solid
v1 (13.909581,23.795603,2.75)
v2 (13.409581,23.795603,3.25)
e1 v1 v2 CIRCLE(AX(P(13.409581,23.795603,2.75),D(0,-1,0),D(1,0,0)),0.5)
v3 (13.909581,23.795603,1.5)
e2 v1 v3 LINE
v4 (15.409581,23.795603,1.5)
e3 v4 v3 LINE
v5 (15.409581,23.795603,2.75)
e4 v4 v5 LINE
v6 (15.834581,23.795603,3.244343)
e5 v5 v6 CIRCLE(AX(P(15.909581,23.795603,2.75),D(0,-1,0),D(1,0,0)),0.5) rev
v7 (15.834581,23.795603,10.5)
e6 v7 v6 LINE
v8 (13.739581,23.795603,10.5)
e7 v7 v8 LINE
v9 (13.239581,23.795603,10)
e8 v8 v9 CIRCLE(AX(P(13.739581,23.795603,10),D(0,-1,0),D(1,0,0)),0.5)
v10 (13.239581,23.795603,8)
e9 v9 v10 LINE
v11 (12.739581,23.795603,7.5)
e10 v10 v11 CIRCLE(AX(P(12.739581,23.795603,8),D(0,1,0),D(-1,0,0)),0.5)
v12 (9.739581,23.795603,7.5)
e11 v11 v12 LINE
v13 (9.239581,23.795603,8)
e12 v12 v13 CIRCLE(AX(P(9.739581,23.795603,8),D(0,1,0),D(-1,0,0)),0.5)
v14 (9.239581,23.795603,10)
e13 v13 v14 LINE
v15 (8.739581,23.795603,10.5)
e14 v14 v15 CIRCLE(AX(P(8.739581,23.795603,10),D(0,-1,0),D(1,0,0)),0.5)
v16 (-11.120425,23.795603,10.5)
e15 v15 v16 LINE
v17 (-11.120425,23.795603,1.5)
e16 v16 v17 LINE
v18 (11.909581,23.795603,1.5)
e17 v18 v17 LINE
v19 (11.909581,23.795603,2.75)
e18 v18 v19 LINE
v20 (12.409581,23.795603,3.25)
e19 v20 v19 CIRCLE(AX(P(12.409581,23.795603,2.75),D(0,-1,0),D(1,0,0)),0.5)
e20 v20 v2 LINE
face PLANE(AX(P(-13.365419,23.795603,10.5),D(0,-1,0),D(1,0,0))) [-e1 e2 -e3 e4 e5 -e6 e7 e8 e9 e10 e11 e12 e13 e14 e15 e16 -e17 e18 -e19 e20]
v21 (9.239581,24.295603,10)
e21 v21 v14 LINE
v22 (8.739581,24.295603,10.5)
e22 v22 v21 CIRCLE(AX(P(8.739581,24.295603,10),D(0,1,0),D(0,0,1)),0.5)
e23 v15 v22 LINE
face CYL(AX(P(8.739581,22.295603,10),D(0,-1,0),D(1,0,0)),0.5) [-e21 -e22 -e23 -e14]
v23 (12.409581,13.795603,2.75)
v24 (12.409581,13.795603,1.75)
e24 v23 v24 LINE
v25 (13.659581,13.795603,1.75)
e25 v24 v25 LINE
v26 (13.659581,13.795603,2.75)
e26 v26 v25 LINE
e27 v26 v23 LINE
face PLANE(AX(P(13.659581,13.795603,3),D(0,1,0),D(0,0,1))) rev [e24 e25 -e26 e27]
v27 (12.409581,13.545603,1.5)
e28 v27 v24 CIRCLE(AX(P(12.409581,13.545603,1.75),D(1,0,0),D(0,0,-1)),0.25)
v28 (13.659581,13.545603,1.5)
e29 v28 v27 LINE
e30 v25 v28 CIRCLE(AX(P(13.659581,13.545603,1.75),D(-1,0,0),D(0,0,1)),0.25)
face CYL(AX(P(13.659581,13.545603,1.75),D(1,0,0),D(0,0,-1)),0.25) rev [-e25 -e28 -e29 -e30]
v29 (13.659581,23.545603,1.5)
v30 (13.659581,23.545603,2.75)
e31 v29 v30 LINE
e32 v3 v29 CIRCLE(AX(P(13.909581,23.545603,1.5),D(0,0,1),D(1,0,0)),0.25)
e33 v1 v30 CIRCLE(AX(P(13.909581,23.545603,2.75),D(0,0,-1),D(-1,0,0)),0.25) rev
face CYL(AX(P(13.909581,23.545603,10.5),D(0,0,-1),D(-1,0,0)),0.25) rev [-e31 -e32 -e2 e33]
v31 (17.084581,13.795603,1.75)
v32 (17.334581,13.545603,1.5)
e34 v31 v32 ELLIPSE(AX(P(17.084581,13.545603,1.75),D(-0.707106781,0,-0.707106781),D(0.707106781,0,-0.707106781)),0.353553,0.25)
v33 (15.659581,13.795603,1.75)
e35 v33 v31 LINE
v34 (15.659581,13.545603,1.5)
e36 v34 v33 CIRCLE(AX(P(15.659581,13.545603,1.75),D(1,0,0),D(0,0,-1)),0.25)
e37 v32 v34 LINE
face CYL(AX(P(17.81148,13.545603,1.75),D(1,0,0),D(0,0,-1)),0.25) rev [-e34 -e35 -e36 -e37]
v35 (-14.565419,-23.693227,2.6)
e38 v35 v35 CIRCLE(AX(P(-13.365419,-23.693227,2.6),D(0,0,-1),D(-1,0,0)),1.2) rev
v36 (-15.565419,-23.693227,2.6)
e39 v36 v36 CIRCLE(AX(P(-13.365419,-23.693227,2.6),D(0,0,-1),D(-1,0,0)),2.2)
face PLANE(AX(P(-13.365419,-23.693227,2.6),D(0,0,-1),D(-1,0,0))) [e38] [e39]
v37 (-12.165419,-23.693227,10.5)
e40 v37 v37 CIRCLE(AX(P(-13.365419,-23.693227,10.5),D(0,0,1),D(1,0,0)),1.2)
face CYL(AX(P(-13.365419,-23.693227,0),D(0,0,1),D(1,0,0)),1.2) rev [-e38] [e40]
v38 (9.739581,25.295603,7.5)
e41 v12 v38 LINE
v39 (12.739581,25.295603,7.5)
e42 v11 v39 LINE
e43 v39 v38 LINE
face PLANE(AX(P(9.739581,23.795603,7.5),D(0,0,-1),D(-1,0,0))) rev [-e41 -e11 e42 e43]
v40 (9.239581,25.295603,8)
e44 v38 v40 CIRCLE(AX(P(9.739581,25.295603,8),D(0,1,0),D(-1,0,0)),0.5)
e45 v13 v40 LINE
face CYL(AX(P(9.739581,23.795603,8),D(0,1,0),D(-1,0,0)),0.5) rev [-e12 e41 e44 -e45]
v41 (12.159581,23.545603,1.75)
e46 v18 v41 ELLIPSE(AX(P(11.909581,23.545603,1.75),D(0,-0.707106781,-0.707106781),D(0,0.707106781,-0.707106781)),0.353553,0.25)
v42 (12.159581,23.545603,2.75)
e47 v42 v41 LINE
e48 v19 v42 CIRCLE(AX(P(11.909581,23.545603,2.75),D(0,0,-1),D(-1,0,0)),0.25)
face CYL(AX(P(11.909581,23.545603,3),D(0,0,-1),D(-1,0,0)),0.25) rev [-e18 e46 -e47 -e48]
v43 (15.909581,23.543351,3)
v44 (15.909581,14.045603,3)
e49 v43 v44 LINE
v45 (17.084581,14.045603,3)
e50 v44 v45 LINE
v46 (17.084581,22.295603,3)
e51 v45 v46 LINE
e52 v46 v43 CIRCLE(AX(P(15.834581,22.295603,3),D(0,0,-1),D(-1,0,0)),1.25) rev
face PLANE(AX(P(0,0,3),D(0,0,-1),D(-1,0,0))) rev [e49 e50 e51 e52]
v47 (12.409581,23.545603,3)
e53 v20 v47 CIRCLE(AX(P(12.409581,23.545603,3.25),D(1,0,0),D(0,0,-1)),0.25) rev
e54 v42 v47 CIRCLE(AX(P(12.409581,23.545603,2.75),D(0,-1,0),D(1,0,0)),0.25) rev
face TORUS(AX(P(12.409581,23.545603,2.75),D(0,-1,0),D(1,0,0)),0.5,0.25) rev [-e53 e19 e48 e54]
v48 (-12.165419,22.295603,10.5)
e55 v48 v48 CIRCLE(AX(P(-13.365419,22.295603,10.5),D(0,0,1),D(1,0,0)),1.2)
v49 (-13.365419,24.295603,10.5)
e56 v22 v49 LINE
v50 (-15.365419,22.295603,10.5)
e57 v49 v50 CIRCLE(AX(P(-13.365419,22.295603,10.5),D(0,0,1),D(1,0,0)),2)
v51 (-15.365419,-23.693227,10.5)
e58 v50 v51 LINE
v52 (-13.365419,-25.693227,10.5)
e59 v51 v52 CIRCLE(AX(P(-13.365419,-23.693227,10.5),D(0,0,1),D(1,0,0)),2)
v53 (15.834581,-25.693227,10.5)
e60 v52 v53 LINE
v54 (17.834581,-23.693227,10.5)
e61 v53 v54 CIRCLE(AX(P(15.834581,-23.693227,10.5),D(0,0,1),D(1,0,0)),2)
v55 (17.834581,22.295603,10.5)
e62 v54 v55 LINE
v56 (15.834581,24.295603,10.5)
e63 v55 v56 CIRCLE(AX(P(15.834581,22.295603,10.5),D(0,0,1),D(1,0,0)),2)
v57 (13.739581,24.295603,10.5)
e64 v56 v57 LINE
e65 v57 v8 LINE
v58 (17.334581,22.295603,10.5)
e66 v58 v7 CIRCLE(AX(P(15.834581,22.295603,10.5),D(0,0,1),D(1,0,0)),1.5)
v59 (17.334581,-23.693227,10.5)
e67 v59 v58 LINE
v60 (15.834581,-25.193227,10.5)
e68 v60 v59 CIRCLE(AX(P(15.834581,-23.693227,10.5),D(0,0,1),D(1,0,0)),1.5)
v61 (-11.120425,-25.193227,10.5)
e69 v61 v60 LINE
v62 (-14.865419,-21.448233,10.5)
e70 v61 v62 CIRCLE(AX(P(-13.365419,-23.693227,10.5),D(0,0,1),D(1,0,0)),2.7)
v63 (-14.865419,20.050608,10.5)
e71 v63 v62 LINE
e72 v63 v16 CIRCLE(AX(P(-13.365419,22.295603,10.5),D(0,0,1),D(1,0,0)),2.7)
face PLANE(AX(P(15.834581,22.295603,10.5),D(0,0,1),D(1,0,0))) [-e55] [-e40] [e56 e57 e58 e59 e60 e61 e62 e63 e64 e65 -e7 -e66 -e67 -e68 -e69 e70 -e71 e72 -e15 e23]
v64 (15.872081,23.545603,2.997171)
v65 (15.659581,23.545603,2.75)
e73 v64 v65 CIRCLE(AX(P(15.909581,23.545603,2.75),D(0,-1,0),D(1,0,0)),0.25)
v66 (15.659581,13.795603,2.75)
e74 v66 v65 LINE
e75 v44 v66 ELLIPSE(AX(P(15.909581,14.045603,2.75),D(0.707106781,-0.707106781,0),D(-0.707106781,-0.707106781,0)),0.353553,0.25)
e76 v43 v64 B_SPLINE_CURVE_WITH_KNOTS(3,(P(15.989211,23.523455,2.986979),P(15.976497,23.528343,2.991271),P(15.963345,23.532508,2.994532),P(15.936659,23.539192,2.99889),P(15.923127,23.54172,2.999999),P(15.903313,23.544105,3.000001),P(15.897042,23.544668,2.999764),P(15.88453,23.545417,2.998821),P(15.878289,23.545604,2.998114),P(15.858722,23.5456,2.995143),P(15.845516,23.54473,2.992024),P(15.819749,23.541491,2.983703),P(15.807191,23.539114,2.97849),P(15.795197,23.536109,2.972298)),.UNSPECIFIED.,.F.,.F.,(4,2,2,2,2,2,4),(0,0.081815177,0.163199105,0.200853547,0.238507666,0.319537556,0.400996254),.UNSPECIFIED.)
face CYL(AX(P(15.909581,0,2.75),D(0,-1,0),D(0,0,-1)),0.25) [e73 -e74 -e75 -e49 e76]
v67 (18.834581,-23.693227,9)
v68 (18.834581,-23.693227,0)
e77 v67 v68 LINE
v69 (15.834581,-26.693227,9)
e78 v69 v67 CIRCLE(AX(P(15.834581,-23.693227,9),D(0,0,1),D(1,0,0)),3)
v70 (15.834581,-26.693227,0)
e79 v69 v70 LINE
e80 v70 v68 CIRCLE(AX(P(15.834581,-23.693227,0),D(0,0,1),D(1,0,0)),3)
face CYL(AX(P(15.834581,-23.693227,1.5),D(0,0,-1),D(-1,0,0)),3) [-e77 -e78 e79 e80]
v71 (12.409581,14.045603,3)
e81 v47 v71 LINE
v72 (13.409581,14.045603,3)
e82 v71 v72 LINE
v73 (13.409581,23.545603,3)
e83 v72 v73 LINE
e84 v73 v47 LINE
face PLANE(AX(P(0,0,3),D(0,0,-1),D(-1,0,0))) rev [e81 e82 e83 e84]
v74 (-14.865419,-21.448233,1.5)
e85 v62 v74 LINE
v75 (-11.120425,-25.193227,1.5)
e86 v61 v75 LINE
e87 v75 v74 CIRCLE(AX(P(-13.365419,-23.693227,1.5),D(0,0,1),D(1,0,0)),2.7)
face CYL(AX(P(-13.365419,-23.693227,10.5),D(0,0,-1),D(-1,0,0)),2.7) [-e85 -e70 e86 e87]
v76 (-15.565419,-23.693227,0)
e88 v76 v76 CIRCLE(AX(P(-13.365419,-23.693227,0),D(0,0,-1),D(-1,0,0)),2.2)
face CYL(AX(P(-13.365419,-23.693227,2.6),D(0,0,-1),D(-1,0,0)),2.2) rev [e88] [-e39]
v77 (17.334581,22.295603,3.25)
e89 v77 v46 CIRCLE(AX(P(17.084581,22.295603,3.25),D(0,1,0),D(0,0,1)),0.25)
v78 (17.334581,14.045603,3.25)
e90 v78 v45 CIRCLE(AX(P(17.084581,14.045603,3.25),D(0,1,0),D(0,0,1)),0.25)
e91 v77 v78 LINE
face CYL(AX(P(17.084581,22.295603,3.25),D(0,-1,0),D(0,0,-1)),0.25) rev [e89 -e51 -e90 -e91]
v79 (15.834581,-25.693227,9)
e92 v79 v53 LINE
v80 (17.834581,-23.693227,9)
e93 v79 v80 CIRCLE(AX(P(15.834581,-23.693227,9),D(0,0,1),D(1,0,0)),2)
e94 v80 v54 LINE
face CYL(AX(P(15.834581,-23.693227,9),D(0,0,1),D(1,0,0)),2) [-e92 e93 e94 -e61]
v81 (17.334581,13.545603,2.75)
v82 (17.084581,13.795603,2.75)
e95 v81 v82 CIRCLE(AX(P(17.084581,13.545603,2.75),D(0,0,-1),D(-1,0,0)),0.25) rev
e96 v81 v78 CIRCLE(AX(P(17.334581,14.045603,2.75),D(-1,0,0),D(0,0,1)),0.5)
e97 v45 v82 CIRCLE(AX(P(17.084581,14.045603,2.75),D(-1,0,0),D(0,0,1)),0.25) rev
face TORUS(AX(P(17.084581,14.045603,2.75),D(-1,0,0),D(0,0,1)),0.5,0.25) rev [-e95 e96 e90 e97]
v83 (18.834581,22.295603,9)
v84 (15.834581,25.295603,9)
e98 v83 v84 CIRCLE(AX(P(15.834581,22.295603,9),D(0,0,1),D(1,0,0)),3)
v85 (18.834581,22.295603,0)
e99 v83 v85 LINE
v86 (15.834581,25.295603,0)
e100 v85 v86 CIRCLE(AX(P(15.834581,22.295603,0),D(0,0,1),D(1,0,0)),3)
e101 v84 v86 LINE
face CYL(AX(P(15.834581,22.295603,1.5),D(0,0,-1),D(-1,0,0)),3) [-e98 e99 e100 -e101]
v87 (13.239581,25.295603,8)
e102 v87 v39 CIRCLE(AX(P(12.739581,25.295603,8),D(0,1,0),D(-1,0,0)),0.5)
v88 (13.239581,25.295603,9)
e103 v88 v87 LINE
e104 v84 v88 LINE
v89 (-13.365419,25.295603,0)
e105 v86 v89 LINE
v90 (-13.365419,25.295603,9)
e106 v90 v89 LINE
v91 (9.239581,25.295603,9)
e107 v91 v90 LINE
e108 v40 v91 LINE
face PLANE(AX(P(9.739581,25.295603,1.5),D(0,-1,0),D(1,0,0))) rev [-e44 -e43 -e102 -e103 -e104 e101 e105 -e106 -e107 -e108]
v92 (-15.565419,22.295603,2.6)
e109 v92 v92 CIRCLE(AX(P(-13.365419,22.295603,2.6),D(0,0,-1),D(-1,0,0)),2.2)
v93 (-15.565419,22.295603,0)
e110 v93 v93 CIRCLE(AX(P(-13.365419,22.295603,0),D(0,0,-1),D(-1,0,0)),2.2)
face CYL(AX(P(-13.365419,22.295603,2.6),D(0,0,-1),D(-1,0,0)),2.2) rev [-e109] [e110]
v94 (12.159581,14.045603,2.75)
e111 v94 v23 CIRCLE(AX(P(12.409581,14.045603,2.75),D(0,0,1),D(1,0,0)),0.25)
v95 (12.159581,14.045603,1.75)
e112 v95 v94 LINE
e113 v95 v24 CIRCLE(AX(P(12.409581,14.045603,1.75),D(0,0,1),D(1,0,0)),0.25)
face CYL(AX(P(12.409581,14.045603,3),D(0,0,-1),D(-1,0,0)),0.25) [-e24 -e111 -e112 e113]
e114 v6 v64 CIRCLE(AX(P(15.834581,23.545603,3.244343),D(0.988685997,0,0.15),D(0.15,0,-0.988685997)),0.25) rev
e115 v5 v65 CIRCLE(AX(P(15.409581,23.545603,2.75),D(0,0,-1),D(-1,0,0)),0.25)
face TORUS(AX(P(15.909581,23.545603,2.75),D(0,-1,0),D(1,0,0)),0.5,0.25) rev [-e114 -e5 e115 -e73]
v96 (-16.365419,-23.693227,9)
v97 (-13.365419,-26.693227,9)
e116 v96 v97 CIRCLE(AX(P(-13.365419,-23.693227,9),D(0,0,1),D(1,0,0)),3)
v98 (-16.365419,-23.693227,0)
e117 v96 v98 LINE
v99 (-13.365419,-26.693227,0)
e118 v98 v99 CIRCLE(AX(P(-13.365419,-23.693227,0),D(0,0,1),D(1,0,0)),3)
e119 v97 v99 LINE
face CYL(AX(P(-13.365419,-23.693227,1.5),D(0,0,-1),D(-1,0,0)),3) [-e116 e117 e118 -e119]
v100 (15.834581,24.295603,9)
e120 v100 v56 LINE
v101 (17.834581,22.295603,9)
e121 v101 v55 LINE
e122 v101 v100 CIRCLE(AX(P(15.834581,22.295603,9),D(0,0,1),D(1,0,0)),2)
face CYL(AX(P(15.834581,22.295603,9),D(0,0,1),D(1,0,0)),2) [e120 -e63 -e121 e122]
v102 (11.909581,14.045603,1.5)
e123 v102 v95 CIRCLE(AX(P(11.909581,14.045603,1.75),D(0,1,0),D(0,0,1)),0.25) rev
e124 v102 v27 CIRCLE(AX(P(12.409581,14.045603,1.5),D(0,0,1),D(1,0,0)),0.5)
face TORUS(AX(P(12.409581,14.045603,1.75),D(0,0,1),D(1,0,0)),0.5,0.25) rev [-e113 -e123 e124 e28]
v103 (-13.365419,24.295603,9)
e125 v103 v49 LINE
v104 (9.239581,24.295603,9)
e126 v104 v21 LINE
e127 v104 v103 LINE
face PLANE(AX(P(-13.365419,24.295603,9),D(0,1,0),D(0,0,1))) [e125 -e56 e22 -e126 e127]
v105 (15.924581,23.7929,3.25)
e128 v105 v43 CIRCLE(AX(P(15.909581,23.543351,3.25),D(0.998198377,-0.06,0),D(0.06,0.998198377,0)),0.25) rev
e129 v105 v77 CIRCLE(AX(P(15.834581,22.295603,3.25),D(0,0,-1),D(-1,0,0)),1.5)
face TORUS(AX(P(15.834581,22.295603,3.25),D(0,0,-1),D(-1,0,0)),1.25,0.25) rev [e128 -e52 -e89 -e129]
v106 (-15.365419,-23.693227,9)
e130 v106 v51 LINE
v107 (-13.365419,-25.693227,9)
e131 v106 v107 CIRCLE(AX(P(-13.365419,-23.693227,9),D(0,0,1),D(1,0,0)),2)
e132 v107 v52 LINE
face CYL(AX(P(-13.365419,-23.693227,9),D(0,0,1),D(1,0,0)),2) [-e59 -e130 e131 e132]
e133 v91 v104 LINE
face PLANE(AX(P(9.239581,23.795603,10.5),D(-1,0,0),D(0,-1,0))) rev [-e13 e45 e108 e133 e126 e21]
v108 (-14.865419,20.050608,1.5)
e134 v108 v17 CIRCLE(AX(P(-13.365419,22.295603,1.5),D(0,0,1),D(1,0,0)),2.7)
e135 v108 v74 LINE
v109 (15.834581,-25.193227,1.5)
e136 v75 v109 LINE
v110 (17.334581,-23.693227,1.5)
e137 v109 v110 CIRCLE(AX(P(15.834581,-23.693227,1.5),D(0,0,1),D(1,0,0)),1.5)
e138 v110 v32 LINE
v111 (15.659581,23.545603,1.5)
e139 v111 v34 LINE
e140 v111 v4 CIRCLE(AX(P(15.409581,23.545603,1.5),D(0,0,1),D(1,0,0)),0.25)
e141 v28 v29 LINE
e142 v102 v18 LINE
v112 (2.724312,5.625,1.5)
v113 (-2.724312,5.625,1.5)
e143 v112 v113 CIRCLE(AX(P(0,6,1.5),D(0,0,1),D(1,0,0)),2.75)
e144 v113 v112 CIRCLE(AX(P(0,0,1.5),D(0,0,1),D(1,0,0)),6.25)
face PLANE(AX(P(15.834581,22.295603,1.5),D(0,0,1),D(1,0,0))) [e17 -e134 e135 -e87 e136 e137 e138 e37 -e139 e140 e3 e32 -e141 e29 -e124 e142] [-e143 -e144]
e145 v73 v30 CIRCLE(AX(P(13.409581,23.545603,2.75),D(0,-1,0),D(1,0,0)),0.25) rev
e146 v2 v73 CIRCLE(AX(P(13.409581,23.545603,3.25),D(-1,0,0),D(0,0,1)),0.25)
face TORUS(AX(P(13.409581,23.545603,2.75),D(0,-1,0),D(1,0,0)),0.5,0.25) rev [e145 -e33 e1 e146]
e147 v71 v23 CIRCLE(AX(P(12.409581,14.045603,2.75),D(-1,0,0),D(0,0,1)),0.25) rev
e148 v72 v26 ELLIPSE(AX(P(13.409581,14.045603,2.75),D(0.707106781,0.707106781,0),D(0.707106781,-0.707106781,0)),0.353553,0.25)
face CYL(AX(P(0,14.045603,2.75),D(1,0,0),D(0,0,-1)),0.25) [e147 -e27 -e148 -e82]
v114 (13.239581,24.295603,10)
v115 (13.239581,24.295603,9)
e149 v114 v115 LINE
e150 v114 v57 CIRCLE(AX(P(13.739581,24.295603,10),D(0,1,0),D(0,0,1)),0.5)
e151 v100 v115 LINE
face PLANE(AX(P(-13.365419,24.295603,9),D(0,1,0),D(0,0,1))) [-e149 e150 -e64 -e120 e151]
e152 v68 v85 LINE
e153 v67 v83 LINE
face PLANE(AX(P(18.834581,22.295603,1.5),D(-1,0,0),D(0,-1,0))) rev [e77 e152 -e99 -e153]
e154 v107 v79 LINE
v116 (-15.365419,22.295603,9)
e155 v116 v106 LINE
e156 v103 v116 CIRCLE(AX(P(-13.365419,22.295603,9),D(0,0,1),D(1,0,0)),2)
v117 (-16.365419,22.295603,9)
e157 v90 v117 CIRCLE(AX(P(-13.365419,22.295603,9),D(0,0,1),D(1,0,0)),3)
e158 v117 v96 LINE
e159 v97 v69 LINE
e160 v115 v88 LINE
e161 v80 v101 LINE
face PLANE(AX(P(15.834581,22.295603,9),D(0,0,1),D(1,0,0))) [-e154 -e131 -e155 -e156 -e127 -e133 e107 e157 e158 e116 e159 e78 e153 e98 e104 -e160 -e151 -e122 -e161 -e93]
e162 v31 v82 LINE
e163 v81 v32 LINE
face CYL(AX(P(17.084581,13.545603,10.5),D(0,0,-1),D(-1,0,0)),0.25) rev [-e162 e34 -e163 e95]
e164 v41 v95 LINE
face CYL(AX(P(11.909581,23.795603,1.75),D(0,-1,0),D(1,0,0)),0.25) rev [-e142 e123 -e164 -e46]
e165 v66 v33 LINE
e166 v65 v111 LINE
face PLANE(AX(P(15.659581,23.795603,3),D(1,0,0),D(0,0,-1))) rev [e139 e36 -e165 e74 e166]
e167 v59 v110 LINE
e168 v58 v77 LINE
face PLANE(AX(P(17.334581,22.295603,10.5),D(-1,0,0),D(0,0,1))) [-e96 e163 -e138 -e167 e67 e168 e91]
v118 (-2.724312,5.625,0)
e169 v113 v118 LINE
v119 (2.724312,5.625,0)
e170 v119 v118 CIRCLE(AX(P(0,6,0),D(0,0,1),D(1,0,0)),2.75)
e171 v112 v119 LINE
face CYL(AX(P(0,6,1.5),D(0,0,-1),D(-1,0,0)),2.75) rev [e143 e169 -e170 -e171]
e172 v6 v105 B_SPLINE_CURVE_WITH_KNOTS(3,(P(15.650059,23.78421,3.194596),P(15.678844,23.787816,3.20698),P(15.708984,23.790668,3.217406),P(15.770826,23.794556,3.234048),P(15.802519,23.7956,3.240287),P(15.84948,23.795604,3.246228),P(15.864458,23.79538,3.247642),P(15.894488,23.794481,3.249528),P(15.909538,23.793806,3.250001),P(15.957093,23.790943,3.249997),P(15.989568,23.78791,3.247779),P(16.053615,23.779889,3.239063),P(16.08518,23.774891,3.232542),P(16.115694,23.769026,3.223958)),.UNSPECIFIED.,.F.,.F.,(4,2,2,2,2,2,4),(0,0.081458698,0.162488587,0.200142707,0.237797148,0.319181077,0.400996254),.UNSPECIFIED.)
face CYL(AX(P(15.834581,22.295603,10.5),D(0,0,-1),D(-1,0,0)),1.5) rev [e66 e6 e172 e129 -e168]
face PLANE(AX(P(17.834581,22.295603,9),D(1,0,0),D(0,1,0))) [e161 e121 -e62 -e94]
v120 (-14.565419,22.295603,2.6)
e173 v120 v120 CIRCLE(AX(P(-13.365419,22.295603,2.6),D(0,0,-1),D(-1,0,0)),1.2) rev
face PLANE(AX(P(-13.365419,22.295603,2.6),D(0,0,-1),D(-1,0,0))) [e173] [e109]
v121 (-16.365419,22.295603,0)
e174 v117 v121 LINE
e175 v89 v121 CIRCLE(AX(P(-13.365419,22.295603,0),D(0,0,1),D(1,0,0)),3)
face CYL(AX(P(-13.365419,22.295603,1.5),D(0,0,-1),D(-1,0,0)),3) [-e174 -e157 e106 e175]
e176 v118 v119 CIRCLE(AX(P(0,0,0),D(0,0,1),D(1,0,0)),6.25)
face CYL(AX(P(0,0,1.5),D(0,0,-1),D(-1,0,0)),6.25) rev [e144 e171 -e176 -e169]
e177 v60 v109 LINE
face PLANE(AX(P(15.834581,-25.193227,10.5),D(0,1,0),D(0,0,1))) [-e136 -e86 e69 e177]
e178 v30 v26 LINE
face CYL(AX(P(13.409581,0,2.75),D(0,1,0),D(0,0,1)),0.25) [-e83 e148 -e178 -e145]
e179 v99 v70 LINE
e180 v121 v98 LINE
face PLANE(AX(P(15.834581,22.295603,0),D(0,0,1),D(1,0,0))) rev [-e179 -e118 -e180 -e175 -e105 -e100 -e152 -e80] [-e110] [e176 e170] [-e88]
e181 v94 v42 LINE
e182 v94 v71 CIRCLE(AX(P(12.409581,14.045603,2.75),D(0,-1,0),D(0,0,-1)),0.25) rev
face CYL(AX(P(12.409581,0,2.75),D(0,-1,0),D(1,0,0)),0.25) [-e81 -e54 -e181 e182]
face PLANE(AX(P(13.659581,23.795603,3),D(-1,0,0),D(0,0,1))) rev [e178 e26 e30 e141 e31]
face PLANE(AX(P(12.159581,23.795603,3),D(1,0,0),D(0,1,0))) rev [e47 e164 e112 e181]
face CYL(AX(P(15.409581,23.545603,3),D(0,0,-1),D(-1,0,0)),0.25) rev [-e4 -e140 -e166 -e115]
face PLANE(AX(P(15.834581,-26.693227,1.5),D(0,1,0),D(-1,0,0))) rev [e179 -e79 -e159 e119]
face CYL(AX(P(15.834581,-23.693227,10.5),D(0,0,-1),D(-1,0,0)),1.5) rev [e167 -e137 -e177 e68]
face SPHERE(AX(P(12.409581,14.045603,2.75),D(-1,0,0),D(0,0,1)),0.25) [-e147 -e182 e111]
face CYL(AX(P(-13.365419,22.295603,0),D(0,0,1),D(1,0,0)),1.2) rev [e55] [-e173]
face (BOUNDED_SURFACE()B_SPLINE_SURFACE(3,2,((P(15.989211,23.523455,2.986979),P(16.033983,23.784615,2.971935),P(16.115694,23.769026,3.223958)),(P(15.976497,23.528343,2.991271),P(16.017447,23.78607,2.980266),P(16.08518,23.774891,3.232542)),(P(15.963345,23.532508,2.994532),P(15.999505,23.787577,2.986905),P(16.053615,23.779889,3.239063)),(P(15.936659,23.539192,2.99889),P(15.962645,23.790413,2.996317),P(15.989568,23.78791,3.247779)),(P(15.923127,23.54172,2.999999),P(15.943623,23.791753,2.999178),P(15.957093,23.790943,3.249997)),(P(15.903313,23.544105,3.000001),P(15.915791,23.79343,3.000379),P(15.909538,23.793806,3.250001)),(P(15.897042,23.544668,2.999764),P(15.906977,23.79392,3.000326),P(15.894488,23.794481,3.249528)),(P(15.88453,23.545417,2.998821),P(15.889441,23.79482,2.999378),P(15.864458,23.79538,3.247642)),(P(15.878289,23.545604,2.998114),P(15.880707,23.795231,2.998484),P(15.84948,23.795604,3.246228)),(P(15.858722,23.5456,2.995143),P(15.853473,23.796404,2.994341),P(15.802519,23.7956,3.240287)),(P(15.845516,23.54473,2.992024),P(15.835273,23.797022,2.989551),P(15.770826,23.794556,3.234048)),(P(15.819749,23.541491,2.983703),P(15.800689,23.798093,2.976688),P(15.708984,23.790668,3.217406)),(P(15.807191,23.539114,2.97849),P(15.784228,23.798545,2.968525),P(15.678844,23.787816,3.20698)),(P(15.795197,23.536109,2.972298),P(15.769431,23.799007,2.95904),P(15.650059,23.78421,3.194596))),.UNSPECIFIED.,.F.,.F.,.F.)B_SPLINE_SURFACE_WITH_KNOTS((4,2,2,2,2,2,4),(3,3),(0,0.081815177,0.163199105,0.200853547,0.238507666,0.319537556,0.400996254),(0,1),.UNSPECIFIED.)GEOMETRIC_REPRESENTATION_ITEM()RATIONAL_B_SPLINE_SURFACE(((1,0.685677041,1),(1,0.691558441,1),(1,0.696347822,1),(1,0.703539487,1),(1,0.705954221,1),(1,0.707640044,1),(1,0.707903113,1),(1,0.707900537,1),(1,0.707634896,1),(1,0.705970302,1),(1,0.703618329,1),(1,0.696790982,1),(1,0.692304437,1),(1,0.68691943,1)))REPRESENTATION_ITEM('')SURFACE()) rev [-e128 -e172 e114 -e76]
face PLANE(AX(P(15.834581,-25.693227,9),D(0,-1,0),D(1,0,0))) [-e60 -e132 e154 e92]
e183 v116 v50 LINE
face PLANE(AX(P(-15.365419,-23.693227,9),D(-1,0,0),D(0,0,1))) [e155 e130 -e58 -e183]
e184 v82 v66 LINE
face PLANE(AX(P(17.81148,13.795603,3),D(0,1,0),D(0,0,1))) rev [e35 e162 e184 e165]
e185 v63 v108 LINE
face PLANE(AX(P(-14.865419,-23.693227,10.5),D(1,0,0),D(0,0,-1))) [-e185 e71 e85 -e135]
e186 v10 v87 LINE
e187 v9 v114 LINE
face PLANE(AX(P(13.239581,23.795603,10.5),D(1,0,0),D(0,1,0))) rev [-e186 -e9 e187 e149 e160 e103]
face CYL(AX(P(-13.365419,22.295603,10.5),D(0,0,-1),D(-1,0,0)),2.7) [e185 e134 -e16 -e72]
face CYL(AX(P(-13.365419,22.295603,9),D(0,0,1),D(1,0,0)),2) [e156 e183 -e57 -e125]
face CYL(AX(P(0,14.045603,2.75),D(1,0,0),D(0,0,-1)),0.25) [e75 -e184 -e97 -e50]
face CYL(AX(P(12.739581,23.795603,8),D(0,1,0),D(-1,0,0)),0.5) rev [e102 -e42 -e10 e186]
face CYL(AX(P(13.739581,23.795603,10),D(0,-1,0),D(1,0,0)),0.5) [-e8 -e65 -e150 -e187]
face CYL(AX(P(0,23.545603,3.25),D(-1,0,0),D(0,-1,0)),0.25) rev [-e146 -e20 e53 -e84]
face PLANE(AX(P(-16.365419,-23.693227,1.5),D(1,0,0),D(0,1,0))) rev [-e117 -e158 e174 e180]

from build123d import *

# Parameters (mm, degrees)
EXRUDE_BASE_DEPTH       = 1.5
EXTRUDE_SIDEWALLS_DEPTH = 9
PARTLING_LINE_LIP_START = -1.5
PARTLING_LINE_LIP_DEPTH = 1.5
SKETCH4_W               = 1.5
SKETCH4_H               = 10
SKETCH4_W_2             = 2.151899305
BOSS_EXTRUDE3_DEPTH     = 1.5
FILLET2_R               = 0.25
CUT_EXTRUDE2_DEPTH      = 1.5
FILLET3_R               = 0.5
SCREWBOSS_DEPTH         = 9
SCREWHOLE_DEPTH         = 34.88613029
SCREWHOLE_DEPTH_BACK    = 34.88613029
SCREW_HOLES_R           = 1.2
SKETCH8_R               = 2.2
CUT_EXTRUDE4_DEPTH      = 2.6


with BuildPart() as part:
    # Sketch1 → Exrude-Base (new body)
    with BuildSketch(Plane.XY):
        with BuildLine():
            Line((9.739580757, 25.295602697), (12.739580757, 25.295602697))
            Line((12.739580757, 25.295602697), (13.239580757, 25.295602697))
            Line((13.239580757, 25.295602697), (13.739580757, 25.295602697))
            Line((13.739580757, 25.295602697), (15.834580757, 25.295602697))
            ThreePointArc((15.834580757, 25.295602697), (17.9559011, 24.41692304), (18.834580757, 22.295602697))
            Line((18.834580757, 22.295602697), (18.834580757, -23.693227454))
            ThreePointArc((18.834580757, -23.693227454), (17.9559011, -25.814547798), (15.834580757, -26.693227454))
            Line((15.834580757, -26.693227454), (-13.365419243, -26.693227454))
            ThreePointArc((-13.365419243, -26.693227454), (-15.486739587, -25.814547798), (-16.365419243, -23.693227454))
            Line((-16.365419243, -23.693227454), (-16.365419243, 22.295602697))
            ThreePointArc((-16.365419243, 22.295602697), (-15.486739587, 24.41692304), (-13.365419243, 25.295602697))
            Line((-13.365419243, 25.295602697), (8.739580757, 25.295602697))
            Line((8.739580757, 25.295602697), (9.239580757, 25.295602697))
            Line((9.239580757, 25.295602697), (9.739580757, 25.295602697))
        make_face()
        with BuildLine():
            ThreePointArc((-2.72431184, 5.625), (0, -6.25), (2.72431184, 5.625))
            ThreePointArc((2.72431184, 5.625), (0, 8.75), (-2.72431184, 5.625))
        make_face(mode=Mode.SUBTRACT)
    extrude(amount=EXRUDE_BASE_DEPTH)

    # Sketch2 → Extrude-Sidewalls (add)
    with BuildSketch(Plane.XY.offset(1.5)):
        with BuildLine():
            Line((18.834580757, 22.295602697), (18.834580757, -23.693227454))
            ThreePointArc((18.834580757, -23.693227454), (17.9559011, -25.814547798), (15.834580757, -26.693227454))
            Line((15.834580757, -26.693227454), (-13.365419243, -26.693227454))
            ThreePointArc((-13.365419243, -26.693227454), (-15.486739587, -25.814547798), (-16.365419243, -23.693227454))
            Line((-16.365419243, -23.693227454), (-16.365419243, 22.295602697))
            ThreePointArc((-16.365419243, 22.295602697), (-15.486739587, 24.41692304), (-13.365419243, 25.295602697))
            Line((-13.365419243, 25.295602697), (15.834580757, 25.295602697))
            ThreePointArc((15.834580757, 25.295602697), (17.9559011, 24.41692304), (18.834580757, 22.295602697))
        make_face()
        with BuildLine():
            Line((17.334580757, 22.295602697), (17.334580757, -23.693227454))
            ThreePointArc((17.334580757, -23.693227454), (16.895240929, -24.753887626), (15.834580757, -25.193227454))
            Line((15.834580757, -25.193227454), (-13.365419243, -25.193227454))
            ThreePointArc((-13.365419243, -25.193227454), (-14.426079415, -24.753887626), (-14.865419243, -23.693227454))
            Line((-14.865419243, -23.693227454), (-14.865419243, 22.295602697))
            ThreePointArc((-14.865419243, 22.295602697), (-14.426079415, 23.356262868), (-13.365419243, 23.795602697))
            Line((-13.365419243, 23.795602697), (15.834580757, 23.795602697))
            ThreePointArc((15.834580757, 23.795602697), (16.895240929, 23.356262868), (17.334580757, 22.295602697))
        make_face(mode=Mode.SUBTRACT)
    extrude(amount=EXTRUDE_SIDEWALLS_DEPTH)

    # Sketch3 → Partling-Line-Lip (cut)
    with BuildSketch(Plane.XY.offset(10.5).offset(PARTLING_LINE_LIP_START)):
        with BuildLine():
            Line((18.834580757, 22.295602697), (18.834580757, -23.693227454))
            ThreePointArc((18.834580757, -23.693227454), (17.9559011, -25.814547798), (15.834580757, -26.693227454))
            Line((15.834580757, -26.693227454), (-13.365419243, -26.693227454))
            ThreePointArc((-13.365419243, -26.693227454), (-15.486739587, -25.814547798), (-16.365419243, -23.693227454))
            Line((-16.365419243, -23.693227454), (-16.365419243, 22.295602697))
            ThreePointArc((-16.365419243, 22.295602697), (-15.486739587, 24.41692304), (-13.365419243, 25.295602697))
            Line((-13.365419243, 25.295602697), (15.834580757, 25.295602697))
            ThreePointArc((15.834580757, 25.295602697), (17.9559011, 24.41692304), (18.834580757, 22.295602697))
        make_face()
        with BuildLine():
            Line((17.834580757, 22.295602697), (17.834580757, -23.693227454))
            ThreePointArc((17.834580757, -23.693227454), (17.248794319, -25.107441017), (15.834580757, -25.693227454))
            Line((15.834580757, -25.693227454), (-13.365419243, -25.693227454))
            ThreePointArc((-13.365419243, -25.693227454), (-14.779632806, -25.107441017), (-15.365419243, -23.693227454))
            Line((-15.365419243, -23.693227454), (-15.365419243, 22.295602697))
            ThreePointArc((-15.365419243, 22.295602697), (-14.779632806, 23.709816259), (-13.365419243, 24.295602697))
            Line((-13.365419243, 24.295602697), (15.834580757, 24.295602697))
            ThreePointArc((15.834580757, 24.295602697), (17.248794319, 23.709816259), (17.834580757, 22.295602697))
        make_face(mode=Mode.SUBTRACT)
    extrude(amount=PARTLING_LINE_LIP_DEPTH, mode=Mode.SUBTRACT)

    # Sketch4 → Boss-Extrude3 (add)
    with BuildSketch(Plane.XY.offset(1.5)):
        with Locations((12.909580757, 18.795602697)):
            Rectangle(SKETCH4_W, SKETCH4_H)
        with Locations((16.73553041, 18.795602697)):
            Rectangle(SKETCH4_W_2, SKETCH4_H)
    extrude(amount=BOSS_EXTRUDE3_DEPTH)

    # Fillet2
    fillet2_edges = [part.edges().sort_by_distance(p)[0] for p in [
        (13.659580757, 18.795602697, 3),
        (12.159580757, 18.795602697, 3),
        (12.159580757, 13.795602697, 2.25),
        (16.497080757, 13.795602697, 3),
        (15.659580757, 18.795602697, 3),
        (12.909580757, 13.795602697, 3),
    ]]
    fillet(fillet2_edges, radius=FILLET2_R)
    fillet2_2_edges = [part.edges().sort_by_distance(p)[0] for p in [
        (13.659580757, 23.795602697, 2.125),
        (13.034580757, 13.795602697, 1.5),
        (17.334580757, 13.795602697, 2.125),
        (15.659580757, 23.795602697, 2.125),
        (12.909580757, 23.795602697, 3),
        (12.159580757, 23.795602697, 2.125),
        (12.159580757, 18.920602697, 1.5),
        (17.334580757, 18.170602697, 3),
        (16.921434013, 23.329406353, 3),
        (16.497080757, 13.795602697, 1.5),
        (15.871629396, 23.795145092, 2.997102598),
        (15.708024313, 23.795602697, 2.897901995),
        (17.334580757, 13.868826001, 2.926776695),
        (12.232804061, 13.868826001, 1.5),
        (12.232804061, 23.795602697, 2.926776695),
        (13.586357452, 23.795602697, 2.926776695),
    ]]
    fillet(fillet2_2_edges, radius=FILLET2_R)

    # Sketch5 → Cut-Extrude2 (cut)
    with BuildSketch(Plane(origin=(0, 25.295602697, 0), x_dir=(1, 0, 0), z_dir=(0, 1, 0))):
        with BuildLine():
            Line((9.239580757, -10.5), (9.239580757, -8))
            ThreePointArc((9.239580757, -8), (9.386027366, -7.646446609), (9.739580757, -7.5))
            Line((9.739580757, -7.5), (12.739580757, -7.5))
            ThreePointArc((12.739580757, -7.5), (13.093134147, -7.646446609), (13.239580757, -8))
            Line((13.239580757, -8), (13.239580757, -10.5))
            Line((13.239580757, -10.5), (9.239580757, -10.5))
        make_face()
    extrude(amount=-CUT_EXTRUDE2_DEPTH, mode=Mode.SUBTRACT)

    # Fillet3
    fillet3_edges = [part.edges().sort_by_distance(p)[0] for p in [
        (13.239580757, 24.045602697, 10.5),
        (9.239580757, 24.045602697, 10.5),
    ]]
    fillet(fillet3_edges, radius=FILLET3_R)

    # Sketch7 → ScrewBoss (add)
    with BuildSketch(Plane.XY.offset(1.5)):
        with BuildLine():
            Line((-13.365419243, -25.193227454), (-11.120424811, -25.193227454))
            ThreePointArc((-11.120424811, -25.193227454), (-11.456230934, -21.784039145), (-14.865419243, -21.448233022))
            Line((-14.865419243, -21.448233022), (-14.865419243, -23.693227454))
            ThreePointArc((-14.865419243, -23.693227454), (-14.426079415, -24.753887626), (-13.365419243, -25.193227454))
        make_face()
        with BuildLine():
            Line((-11.120424811, 23.795602697), (-13.365419243, 23.795602697))
            ThreePointArc((-13.365419243, 23.795602697), (-14.426079415, 23.356262868), (-14.865419243, 22.295602697))
            Line((-14.865419243, 22.295602697), (-14.865419243, 20.050608265))
            ThreePointArc((-14.865419243, 20.050608265), (-11.456230934, 20.386414387), (-11.120424811, 23.795602697))
        make_face()
    extrude(amount=SCREWBOSS_DEPTH)

    # Screw-Holes → ScrewHole (cut, two sides: drawn at the far end of the back side and taken through both)
    with BuildSketch(Plane.XY.offset(1.5).offset(-SCREWHOLE_DEPTH_BACK)):
        with Locations((-13.365419243, 22.295602697)):
            Circle(SCREW_HOLES_R)
        with Locations((-13.365419243, -23.693227454)):
            Circle(SCREW_HOLES_R)
    extrude(amount=SCREWHOLE_DEPTH + SCREWHOLE_DEPTH_BACK, mode=Mode.SUBTRACT)

    # Sketch8 → Cut-Extrude4 (cut)
    with BuildSketch(Plane(origin=(0, 0, 0), x_dir=(-1, 0, 0), z_dir=(0, 0, -1))):
        with Locations((13.365419243, 22.295602697)):
            Circle(SKETCH8_R)
        with Locations((13.365419243, -23.693227454)):
            Circle(SKETCH8_R)
    extrude(amount=-CUT_EXTRUDE4_DEPTH, mode=Mode.SUBTRACT)


solid = part.part
